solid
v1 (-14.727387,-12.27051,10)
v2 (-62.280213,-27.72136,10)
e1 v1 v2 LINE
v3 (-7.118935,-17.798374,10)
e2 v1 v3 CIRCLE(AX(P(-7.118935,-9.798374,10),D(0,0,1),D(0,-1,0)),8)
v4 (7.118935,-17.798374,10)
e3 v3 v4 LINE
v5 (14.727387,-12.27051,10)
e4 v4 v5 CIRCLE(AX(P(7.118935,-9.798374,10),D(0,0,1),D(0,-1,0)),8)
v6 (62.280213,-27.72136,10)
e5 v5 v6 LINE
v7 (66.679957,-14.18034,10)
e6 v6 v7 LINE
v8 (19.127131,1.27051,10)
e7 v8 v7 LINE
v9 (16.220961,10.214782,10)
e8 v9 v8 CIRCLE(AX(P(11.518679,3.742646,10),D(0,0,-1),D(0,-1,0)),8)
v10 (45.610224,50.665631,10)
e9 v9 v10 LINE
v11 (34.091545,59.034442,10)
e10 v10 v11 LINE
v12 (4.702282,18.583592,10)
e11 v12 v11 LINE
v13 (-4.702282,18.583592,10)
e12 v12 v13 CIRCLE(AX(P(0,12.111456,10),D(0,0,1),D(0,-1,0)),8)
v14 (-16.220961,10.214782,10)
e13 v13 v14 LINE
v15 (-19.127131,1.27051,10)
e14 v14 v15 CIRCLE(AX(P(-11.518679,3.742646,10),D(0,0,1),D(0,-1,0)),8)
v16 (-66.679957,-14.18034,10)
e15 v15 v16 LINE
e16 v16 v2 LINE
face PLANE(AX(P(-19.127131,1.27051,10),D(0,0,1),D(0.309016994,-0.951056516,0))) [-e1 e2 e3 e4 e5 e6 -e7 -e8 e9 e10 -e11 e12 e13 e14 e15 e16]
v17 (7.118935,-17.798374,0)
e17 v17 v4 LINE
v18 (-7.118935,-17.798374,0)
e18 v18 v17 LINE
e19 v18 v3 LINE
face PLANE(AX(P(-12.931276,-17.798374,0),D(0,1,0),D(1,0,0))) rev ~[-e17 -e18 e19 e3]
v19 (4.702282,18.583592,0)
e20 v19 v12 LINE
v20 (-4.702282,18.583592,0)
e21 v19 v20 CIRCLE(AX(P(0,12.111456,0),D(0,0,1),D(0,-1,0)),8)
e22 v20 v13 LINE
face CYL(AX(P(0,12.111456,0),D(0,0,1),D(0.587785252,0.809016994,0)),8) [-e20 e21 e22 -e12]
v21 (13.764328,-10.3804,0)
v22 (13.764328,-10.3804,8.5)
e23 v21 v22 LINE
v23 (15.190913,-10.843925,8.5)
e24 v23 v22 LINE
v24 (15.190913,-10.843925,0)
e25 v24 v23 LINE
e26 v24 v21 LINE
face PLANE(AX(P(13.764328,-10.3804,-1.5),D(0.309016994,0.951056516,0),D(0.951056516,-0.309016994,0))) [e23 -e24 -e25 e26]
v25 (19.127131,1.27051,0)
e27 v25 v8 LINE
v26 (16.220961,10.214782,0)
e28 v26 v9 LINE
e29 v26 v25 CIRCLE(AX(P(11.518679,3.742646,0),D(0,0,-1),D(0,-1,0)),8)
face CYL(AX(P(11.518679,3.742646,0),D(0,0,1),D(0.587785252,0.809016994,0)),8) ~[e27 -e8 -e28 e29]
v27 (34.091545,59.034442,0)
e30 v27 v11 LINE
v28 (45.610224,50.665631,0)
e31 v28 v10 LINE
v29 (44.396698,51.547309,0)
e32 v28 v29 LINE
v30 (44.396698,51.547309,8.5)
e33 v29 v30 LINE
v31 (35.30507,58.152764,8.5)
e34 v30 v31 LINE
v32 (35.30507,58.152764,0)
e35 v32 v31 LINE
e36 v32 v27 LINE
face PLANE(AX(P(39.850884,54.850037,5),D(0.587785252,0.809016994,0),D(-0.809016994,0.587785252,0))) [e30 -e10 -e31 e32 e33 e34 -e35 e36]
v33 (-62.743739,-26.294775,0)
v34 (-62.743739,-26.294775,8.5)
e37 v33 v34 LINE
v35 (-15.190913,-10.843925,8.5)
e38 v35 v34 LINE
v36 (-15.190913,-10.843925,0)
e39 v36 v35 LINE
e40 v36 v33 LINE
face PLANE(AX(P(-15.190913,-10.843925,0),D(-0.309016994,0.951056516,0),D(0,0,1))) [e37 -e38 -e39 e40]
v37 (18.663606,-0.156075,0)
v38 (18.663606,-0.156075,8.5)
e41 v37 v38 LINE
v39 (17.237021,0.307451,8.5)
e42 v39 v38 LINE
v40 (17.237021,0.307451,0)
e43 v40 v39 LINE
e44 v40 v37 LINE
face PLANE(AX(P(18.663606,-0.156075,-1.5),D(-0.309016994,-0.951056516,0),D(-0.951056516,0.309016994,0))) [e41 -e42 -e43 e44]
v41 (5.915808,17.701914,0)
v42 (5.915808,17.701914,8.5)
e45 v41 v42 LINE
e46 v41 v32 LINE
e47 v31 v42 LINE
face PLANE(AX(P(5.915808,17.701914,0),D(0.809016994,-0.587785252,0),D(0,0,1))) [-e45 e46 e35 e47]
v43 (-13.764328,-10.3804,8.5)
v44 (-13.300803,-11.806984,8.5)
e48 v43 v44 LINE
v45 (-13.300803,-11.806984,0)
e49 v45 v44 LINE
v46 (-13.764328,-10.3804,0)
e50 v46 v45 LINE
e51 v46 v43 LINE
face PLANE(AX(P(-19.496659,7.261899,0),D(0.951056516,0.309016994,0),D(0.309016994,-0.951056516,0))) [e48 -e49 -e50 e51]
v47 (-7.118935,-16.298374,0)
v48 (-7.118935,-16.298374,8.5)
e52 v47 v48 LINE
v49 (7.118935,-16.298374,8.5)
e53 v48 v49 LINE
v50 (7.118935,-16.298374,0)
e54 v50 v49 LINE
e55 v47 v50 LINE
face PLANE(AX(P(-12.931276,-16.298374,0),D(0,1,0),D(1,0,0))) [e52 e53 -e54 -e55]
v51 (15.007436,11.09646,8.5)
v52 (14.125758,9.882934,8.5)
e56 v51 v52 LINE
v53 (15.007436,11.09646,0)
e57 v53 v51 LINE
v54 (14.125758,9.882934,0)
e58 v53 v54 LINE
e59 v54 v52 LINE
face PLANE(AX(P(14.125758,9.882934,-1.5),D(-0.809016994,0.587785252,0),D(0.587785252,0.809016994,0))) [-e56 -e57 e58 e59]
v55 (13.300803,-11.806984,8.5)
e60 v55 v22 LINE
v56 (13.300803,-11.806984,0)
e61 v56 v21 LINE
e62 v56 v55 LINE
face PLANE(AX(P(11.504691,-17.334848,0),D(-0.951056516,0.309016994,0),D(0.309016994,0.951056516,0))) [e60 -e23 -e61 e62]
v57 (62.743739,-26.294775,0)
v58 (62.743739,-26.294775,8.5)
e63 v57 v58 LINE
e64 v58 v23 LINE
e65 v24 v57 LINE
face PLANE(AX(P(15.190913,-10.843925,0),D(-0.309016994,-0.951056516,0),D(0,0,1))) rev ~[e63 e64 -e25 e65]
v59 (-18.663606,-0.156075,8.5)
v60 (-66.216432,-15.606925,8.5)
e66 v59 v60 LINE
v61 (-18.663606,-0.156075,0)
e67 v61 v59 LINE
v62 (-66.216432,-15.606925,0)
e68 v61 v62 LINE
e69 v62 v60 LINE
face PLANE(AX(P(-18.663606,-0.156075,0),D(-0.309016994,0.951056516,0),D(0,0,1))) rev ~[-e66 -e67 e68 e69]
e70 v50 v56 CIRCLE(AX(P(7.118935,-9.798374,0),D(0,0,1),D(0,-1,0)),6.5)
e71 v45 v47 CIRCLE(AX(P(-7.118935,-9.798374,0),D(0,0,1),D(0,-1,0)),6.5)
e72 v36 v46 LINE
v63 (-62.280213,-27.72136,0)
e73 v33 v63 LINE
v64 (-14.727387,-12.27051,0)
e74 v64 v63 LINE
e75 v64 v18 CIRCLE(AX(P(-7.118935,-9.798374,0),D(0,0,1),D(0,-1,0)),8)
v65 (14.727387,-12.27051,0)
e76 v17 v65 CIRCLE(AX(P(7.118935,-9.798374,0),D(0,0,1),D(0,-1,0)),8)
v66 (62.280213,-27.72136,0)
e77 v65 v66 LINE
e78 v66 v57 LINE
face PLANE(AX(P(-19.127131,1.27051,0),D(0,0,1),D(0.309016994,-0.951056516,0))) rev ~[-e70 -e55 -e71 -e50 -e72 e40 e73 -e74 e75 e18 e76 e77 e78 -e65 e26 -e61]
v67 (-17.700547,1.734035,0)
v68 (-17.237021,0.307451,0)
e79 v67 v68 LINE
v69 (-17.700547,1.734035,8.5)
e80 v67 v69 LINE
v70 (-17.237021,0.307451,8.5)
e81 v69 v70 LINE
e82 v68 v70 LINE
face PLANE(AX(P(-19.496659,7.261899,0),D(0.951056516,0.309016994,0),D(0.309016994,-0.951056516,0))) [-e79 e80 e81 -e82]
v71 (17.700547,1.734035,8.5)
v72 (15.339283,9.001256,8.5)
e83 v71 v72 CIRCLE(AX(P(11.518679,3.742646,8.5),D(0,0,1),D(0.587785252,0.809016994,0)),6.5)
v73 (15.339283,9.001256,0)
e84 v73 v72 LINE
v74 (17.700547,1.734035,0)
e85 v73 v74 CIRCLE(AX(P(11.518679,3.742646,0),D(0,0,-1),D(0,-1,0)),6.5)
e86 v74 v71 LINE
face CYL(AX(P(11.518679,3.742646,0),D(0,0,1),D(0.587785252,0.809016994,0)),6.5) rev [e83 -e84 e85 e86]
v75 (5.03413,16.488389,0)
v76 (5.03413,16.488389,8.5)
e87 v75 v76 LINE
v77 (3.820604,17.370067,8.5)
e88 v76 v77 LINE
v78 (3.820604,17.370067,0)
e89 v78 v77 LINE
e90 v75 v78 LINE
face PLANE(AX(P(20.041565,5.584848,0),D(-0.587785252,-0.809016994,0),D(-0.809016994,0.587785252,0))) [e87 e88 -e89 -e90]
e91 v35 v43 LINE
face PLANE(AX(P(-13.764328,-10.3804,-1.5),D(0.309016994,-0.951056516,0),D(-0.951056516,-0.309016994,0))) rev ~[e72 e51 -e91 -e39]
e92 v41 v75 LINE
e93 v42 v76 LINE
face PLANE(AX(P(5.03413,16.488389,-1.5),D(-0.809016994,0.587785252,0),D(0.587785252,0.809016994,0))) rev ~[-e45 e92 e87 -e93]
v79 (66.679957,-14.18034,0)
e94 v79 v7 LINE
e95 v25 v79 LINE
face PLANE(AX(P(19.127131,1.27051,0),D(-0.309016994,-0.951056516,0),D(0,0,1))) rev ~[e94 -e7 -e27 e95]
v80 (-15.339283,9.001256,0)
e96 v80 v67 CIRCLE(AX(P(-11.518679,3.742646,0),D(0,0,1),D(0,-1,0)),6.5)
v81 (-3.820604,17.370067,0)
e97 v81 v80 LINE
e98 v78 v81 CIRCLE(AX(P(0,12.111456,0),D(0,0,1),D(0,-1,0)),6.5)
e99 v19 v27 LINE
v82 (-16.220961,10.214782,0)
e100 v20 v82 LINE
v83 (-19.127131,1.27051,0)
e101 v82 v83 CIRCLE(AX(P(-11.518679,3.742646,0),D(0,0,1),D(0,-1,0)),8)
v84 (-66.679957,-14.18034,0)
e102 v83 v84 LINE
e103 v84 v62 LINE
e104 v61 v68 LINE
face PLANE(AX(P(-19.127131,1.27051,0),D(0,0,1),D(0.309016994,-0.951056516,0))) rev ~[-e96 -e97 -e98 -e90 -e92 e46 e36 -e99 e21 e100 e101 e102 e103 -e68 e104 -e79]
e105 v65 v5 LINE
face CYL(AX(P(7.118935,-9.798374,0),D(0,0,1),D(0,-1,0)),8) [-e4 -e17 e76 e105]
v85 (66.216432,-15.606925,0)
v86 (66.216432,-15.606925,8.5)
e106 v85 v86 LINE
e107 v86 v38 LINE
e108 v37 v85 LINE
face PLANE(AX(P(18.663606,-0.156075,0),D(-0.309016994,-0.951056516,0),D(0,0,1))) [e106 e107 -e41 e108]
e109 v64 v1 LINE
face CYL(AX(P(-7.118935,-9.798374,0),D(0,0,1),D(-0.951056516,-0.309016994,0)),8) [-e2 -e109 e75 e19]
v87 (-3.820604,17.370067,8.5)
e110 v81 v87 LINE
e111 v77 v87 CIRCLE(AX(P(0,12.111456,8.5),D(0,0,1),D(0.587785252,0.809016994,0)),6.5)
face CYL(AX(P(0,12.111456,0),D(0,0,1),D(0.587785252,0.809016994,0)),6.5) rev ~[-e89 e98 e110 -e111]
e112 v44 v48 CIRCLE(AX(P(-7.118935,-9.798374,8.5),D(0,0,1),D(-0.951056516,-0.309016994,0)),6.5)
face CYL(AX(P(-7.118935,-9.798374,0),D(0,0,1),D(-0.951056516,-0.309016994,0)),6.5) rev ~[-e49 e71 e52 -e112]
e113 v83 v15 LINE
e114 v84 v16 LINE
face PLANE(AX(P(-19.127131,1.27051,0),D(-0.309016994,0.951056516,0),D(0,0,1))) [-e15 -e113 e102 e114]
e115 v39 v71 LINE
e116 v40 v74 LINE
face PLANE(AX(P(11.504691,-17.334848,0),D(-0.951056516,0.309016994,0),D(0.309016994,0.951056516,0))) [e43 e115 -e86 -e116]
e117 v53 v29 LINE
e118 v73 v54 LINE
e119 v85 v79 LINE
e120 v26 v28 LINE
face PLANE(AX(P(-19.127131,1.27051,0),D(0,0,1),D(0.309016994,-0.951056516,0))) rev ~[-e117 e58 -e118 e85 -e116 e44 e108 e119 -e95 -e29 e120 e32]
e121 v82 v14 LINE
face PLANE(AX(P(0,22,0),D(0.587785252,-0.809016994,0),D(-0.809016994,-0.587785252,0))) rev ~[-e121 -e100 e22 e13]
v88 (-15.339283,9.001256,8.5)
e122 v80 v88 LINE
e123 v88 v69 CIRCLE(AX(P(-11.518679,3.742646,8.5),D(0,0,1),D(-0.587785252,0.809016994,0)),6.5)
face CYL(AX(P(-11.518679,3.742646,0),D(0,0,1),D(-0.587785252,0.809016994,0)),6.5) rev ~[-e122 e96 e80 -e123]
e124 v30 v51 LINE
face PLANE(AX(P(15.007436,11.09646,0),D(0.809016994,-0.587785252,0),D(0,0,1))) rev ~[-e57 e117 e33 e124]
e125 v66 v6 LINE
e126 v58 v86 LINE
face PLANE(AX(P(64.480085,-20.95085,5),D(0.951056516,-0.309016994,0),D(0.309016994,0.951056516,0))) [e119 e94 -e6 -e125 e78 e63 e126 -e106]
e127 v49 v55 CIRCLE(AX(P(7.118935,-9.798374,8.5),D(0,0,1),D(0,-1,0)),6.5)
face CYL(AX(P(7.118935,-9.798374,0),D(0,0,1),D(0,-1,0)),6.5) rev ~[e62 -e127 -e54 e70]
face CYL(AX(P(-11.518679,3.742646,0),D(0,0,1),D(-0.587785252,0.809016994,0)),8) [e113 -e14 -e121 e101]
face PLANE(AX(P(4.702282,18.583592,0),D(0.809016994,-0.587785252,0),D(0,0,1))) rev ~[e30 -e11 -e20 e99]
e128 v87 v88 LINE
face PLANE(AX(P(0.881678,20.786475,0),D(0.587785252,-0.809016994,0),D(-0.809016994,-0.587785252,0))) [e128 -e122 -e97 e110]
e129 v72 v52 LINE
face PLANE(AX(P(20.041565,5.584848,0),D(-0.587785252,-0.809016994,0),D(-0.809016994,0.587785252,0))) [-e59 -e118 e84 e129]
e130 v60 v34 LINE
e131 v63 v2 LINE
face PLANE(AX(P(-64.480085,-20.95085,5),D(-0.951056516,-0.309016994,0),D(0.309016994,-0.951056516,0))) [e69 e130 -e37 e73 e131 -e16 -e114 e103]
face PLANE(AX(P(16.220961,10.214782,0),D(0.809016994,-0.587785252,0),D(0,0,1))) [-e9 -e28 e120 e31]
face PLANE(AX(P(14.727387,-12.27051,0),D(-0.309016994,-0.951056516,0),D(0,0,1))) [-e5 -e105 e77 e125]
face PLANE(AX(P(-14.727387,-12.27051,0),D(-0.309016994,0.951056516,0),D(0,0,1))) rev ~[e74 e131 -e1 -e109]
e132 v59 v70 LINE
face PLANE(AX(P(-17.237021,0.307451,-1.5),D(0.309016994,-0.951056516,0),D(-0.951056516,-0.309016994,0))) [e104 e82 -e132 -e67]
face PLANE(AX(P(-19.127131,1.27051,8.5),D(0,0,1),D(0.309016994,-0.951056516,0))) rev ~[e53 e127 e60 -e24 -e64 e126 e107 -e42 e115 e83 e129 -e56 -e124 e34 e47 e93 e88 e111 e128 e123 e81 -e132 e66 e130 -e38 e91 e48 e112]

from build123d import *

# Parameters (mm, degrees)
F1_DEPTH      = 10
F2_R          = 8
F3_T          = -1.5
F4_W          = 14.2378706528
F4_H          = 10
F5_DEPTH      = 50
F7_W          = 14.2378706528
F7_H          = 10
F8_DEPTH      = 50
F6_W          = 14.2378706528
F6_H          = 10
F9_DEPTH      = 50
F10_T         = 1.5
F10_T3_DEPTH  = 13
F10_T5_DEPTH  = 17.2378706528
F10_T7_DEPTH  = 17.2378706528
F10_T10_ANGLE = 72.000000001
F10_T12_ANGLE = 72.000000001
F10_T14_ANGLE = 72.000000001
F10_T16_ANGLE = 72.000000001
F10_T18_ANGLE = 72.000000001


# Not quite as in the source:
# - a shell that OpenCascade refuses in one call is made with other operations: the cavity is built on its own and cut out


with BuildPart() as f1:
    # F0 (on Top) → F1 (new body)
    with BuildSketch(Plane.XY):
        Polygon((20.9232433585, 6.7983738762), (0, 22), (-20.9232433585, 6.7983738762), (-12.9312755504, -17.7983738762), (12.9312755504, -17.7983738762), align=None)
    extrude(amount=F1_DEPTH)

    # F2
    f2_edges = [f1.edges().sort_by_distance(p)[0] for p in [
        (20.923243, 6.798374, 5),
        (0, 22, 5),
        (12.931276, -17.798374, 5),
        (-12.931276, -17.798374, 5),
        (-20.923243, 6.798374, 5),
    ]]
    fillet(f2_edges, radius=F2_R)

    # F3
    f3_openings = [f1.faces().sort_by_distance(p)[0] for p in [
        (0, 0, 0),
    ]]
    offset(amount=F3_T, openings=f3_openings)

    # F4 (on face) → F5 (join)
    with BuildSketch(Plane(origin=(16.9272594545, -5.5, 0), x_dir=(0.3090169944, 0.9510565163, 0), z_dir=(0.9510565163, -0.3090169944, 0))):
        with Locations((0, 5)):
            Rectangle(F4_W, F4_H)
    extrude(amount=F5_DEPTH)

    # F7 (on face) → F8 (join)
    with BuildSketch(Plane(origin=(10.4616216792, 14.3991869381, 0), x_dir=(-0.8090169944, 0.5877852523, 0), z_dir=(0.5877852523, 0.8090169944, 0))):
        with Locations((0, 5)):
            Rectangle(F7_W, F7_H)
    extrude(amount=F8_DEPTH)

    # F6 (on face) → F9 (join)
    with BuildSketch(Plane(origin=(-16.9272594545, -5.5, 0), x_dir=(0.3090169944, -0.9510565163, 0), z_dir=(-0.9510565163, -0.3090169944, 0))):
        with Locations((0, 5)):
            Rectangle(F6_W, F6_H)
    extrude(amount=F9_DEPTH)

    # F10: shell of thickness 1.5, made by hand


with BuildPart() as f10_core1:
    # F10_t2: copy of F1
    add(f1.part)

    # the walls: a layer under each face that stays
    f10_faces = [f10_core1.faces().sort_by_distance(p)[0] for p in [
        (0, 20.11145618, 5),
        (-10.4616216792, 14.3991869381, 5),
        (-19.1271314522, 6.2147817412, 5),
        (-11.8212173447, -16.2705098312, 5),
        (0, -17.7983738762, 5),
        (11.8212173447, -16.2705098312, 5),
        (38.5038003641, -19.9959346906, 5),
        (42.9035443596, -6.4549150281, 5),
        (19.1271314522, 6.2147817412, 5),
        (30.9155926475, 30.4402066006, 5),
        (19.3969133257, 38.8090169944, 5),
        (17.7005466777, 5.7512562497, 4.25),
        (10.9395394663, -15.0569843397, 4.25),
        (0, -16.2983738762, 4.25),
        (-10.9395394663, -15.0569843397, 4.25),
        (-17.7005466777, 5.7512562497, 4.25),
        (-9.5799438008, 13.1856614466, 4.25),
        (0, 18.61145618, 4.25),
        (0, 15.6565411519, 10),
        (-42.9035443596, -6.4549150281, 5),
        (-38.5038003641, -19.9959346906, 5),
        (0, 1.1565411519, 8.5),
    ]]
    thicken(f10_faces, amount=-F10_T, mode=Mode.SUBTRACT)

    # F10_s4 → F10_t3 (cut)
    with BuildSketch(Plane.XY.offset(-1.5)):
        Polygon((4.6989635422, 18.6045441687), (3.8206041399, 17.3700666434), (5.0341296315, 16.488388765), (5.9158075099, 17.7019142566), align=None)
        Polygon((-19.1460325548, 1.2801404241), (-17.7005466777, 1.7340353228), (-17.2370211862, 0.3074505484), (-18.6636059606, -0.1560749432), align=None)
        Polygon((-14.7370180496, -12.2894109339), (-13.3008026823, -11.8069843397), (-13.7643281739, -10.3803995652), (-15.1909129483, -10.8439250568), align=None)
        Polygon((14.7370180496, -12.2894109339), (13.3008026823, -11.8069843397), (13.7643281739, -10.3803995652), (15.1909129483, -10.8439250568), align=None)
        Polygon((19.1460325548, 1.2801404241), (18.6636059606, -0.1560749432), (17.2370211862, 0.3074505484), (17.7005466777, 1.7340353228), align=None)
        Polygon((16.2419133739, 10.2181002174), (15.3392834617, 9.0012562497), (14.1257579702, 9.8829341281), (15.0074358486, 11.0964596197), align=None)
    extrude(amount=F10_T3_DEPTH, mode=Mode.SUBTRACT)

    # F10_s6 → F10_t5 (cut)
    with BuildSketch(Plane.YZ.offset(-8.6189353264)):
        Polygon((-16.2833738762, 8.485), (-17.7983738762, 8.5), (-17.7983738762, 10), (-16.2983738762, 10), align=None)
    extrude(amount=F10_T5_DEPTH, mode=Mode.SUBTRACT)

    # F10_s8 → F10_t7 (cut)
    with BuildSketch(Plane(origin=(6.9728651525, 5.0660830753, 0), x_dir=(0, 0, 1), z_dir=(-0.8090169944, -0.5877852523, 0))):
        Polygon((8.485, 16.2833738762), (8.5, 17.7983738762), (10, 17.7983738762), (10, 16.2983738762), align=None)
    extrude(amount=F10_T7_DEPTH, mode=Mode.SUBTRACT)

    # F10_s9 → F10_t10 (revolve, cut)
    with BuildSketch(Plane(origin=(2.1998719977, 6.7705098312, 0), x_dir=(0, 0, 1), z_dir=(-0.3090169944, -0.9510565163, 0))):
        Polygon((8.485, -16.2833738762), (8.5, -17.7983738762), (10, -17.7983738762), (10, -16.2983738762), align=None)
    revolve(axis=Axis((11.5186793218, 3.7426457862, 8.5), (0, 0, 1)), revolution_arc=F10_T10_ANGLE, mode=Mode.SUBTRACT)

    # F10_s11 → F10_t12 (revolve, cut)
    with BuildSketch(Plane.YZ.offset(7.1189353264)):
        Polygon((-16.2833738762, 8.485), (-17.7983738762, 8.5), (-17.7983738762, 10), (-16.2983738762, 10), align=None)
    revolve(axis=Axis((7.1189353264, -9.7983738762, 8.5), (0, 0, 1)), revolution_arc=F10_T12_ANGLE, mode=Mode.SUBTRACT)

    # F10_s13 → F10_t14 (revolve, cut)
    with BuildSketch(Plane(origin=(2.1998719977, -6.7705098312, 0), x_dir=(0, 0, 1), z_dir=(-0.3090169944, 0.9510565163, 0))):
        Polygon((8.485, -16.2833738762), (8.5, -17.7983738762), (10, -17.7983738762), (10, -16.2983738762), align=None)
    revolve(axis=Axis((-7.1189353264, -9.7983738762, 8.5), (0, 0, 1)), revolution_arc=F10_T14_ANGLE, mode=Mode.SUBTRACT)

    # F10_s15 → F10_t16 (revolve, cut)
    with BuildSketch(Plane(origin=(-5.7593396609, -4.1844051969, 0), x_dir=(0, 0, 1), z_dir=(0.8090169944, 0.5877852523, 0))):
        Polygon((8.485, -16.2833738762), (8.5, -17.7983738762), (10, -17.7983738762), (10, -16.2983738762), align=None)
    revolve(axis=Axis((-11.5186793218, 3.7426457862, 8.5), (0, 0, 1)), revolution_arc=F10_T16_ANGLE, mode=Mode.SUBTRACT)

    # F10_s17 → F10_t18 (revolve, cut)
    with BuildSketch(Plane(origin=(-5.7593396609, 4.1844051969, 0), x_dir=(0, 0, 1), z_dir=(0.8090169944, -0.5877852523, 0))):
        Polygon((8.485, -16.2833738762), (8.5, -17.7983738762), (10, -17.7983738762), (10, -16.2983738762), align=None)
    revolve(axis=Axis((0, 12.11145618, 8.5), (0, 0, 1)), revolution_arc=F10_T18_ANGLE, mode=Mode.SUBTRACT)


with BuildPart() as f1_1:
    add(f1.part)

    # what is left inside the walls is the cavity
    f10_cavity = [f10_core1.part.solids().sort_by_distance(p)[0] for p in [
        (24.715414, 25.972877, 0.015),
        (39.99038, -17.427366, 0.015),
        (-39.99038, -17.427366, 0.015),
    ]]
    add(f10_cavity, mode=Mode.SUBTRACT)


solid = f1_1.part
